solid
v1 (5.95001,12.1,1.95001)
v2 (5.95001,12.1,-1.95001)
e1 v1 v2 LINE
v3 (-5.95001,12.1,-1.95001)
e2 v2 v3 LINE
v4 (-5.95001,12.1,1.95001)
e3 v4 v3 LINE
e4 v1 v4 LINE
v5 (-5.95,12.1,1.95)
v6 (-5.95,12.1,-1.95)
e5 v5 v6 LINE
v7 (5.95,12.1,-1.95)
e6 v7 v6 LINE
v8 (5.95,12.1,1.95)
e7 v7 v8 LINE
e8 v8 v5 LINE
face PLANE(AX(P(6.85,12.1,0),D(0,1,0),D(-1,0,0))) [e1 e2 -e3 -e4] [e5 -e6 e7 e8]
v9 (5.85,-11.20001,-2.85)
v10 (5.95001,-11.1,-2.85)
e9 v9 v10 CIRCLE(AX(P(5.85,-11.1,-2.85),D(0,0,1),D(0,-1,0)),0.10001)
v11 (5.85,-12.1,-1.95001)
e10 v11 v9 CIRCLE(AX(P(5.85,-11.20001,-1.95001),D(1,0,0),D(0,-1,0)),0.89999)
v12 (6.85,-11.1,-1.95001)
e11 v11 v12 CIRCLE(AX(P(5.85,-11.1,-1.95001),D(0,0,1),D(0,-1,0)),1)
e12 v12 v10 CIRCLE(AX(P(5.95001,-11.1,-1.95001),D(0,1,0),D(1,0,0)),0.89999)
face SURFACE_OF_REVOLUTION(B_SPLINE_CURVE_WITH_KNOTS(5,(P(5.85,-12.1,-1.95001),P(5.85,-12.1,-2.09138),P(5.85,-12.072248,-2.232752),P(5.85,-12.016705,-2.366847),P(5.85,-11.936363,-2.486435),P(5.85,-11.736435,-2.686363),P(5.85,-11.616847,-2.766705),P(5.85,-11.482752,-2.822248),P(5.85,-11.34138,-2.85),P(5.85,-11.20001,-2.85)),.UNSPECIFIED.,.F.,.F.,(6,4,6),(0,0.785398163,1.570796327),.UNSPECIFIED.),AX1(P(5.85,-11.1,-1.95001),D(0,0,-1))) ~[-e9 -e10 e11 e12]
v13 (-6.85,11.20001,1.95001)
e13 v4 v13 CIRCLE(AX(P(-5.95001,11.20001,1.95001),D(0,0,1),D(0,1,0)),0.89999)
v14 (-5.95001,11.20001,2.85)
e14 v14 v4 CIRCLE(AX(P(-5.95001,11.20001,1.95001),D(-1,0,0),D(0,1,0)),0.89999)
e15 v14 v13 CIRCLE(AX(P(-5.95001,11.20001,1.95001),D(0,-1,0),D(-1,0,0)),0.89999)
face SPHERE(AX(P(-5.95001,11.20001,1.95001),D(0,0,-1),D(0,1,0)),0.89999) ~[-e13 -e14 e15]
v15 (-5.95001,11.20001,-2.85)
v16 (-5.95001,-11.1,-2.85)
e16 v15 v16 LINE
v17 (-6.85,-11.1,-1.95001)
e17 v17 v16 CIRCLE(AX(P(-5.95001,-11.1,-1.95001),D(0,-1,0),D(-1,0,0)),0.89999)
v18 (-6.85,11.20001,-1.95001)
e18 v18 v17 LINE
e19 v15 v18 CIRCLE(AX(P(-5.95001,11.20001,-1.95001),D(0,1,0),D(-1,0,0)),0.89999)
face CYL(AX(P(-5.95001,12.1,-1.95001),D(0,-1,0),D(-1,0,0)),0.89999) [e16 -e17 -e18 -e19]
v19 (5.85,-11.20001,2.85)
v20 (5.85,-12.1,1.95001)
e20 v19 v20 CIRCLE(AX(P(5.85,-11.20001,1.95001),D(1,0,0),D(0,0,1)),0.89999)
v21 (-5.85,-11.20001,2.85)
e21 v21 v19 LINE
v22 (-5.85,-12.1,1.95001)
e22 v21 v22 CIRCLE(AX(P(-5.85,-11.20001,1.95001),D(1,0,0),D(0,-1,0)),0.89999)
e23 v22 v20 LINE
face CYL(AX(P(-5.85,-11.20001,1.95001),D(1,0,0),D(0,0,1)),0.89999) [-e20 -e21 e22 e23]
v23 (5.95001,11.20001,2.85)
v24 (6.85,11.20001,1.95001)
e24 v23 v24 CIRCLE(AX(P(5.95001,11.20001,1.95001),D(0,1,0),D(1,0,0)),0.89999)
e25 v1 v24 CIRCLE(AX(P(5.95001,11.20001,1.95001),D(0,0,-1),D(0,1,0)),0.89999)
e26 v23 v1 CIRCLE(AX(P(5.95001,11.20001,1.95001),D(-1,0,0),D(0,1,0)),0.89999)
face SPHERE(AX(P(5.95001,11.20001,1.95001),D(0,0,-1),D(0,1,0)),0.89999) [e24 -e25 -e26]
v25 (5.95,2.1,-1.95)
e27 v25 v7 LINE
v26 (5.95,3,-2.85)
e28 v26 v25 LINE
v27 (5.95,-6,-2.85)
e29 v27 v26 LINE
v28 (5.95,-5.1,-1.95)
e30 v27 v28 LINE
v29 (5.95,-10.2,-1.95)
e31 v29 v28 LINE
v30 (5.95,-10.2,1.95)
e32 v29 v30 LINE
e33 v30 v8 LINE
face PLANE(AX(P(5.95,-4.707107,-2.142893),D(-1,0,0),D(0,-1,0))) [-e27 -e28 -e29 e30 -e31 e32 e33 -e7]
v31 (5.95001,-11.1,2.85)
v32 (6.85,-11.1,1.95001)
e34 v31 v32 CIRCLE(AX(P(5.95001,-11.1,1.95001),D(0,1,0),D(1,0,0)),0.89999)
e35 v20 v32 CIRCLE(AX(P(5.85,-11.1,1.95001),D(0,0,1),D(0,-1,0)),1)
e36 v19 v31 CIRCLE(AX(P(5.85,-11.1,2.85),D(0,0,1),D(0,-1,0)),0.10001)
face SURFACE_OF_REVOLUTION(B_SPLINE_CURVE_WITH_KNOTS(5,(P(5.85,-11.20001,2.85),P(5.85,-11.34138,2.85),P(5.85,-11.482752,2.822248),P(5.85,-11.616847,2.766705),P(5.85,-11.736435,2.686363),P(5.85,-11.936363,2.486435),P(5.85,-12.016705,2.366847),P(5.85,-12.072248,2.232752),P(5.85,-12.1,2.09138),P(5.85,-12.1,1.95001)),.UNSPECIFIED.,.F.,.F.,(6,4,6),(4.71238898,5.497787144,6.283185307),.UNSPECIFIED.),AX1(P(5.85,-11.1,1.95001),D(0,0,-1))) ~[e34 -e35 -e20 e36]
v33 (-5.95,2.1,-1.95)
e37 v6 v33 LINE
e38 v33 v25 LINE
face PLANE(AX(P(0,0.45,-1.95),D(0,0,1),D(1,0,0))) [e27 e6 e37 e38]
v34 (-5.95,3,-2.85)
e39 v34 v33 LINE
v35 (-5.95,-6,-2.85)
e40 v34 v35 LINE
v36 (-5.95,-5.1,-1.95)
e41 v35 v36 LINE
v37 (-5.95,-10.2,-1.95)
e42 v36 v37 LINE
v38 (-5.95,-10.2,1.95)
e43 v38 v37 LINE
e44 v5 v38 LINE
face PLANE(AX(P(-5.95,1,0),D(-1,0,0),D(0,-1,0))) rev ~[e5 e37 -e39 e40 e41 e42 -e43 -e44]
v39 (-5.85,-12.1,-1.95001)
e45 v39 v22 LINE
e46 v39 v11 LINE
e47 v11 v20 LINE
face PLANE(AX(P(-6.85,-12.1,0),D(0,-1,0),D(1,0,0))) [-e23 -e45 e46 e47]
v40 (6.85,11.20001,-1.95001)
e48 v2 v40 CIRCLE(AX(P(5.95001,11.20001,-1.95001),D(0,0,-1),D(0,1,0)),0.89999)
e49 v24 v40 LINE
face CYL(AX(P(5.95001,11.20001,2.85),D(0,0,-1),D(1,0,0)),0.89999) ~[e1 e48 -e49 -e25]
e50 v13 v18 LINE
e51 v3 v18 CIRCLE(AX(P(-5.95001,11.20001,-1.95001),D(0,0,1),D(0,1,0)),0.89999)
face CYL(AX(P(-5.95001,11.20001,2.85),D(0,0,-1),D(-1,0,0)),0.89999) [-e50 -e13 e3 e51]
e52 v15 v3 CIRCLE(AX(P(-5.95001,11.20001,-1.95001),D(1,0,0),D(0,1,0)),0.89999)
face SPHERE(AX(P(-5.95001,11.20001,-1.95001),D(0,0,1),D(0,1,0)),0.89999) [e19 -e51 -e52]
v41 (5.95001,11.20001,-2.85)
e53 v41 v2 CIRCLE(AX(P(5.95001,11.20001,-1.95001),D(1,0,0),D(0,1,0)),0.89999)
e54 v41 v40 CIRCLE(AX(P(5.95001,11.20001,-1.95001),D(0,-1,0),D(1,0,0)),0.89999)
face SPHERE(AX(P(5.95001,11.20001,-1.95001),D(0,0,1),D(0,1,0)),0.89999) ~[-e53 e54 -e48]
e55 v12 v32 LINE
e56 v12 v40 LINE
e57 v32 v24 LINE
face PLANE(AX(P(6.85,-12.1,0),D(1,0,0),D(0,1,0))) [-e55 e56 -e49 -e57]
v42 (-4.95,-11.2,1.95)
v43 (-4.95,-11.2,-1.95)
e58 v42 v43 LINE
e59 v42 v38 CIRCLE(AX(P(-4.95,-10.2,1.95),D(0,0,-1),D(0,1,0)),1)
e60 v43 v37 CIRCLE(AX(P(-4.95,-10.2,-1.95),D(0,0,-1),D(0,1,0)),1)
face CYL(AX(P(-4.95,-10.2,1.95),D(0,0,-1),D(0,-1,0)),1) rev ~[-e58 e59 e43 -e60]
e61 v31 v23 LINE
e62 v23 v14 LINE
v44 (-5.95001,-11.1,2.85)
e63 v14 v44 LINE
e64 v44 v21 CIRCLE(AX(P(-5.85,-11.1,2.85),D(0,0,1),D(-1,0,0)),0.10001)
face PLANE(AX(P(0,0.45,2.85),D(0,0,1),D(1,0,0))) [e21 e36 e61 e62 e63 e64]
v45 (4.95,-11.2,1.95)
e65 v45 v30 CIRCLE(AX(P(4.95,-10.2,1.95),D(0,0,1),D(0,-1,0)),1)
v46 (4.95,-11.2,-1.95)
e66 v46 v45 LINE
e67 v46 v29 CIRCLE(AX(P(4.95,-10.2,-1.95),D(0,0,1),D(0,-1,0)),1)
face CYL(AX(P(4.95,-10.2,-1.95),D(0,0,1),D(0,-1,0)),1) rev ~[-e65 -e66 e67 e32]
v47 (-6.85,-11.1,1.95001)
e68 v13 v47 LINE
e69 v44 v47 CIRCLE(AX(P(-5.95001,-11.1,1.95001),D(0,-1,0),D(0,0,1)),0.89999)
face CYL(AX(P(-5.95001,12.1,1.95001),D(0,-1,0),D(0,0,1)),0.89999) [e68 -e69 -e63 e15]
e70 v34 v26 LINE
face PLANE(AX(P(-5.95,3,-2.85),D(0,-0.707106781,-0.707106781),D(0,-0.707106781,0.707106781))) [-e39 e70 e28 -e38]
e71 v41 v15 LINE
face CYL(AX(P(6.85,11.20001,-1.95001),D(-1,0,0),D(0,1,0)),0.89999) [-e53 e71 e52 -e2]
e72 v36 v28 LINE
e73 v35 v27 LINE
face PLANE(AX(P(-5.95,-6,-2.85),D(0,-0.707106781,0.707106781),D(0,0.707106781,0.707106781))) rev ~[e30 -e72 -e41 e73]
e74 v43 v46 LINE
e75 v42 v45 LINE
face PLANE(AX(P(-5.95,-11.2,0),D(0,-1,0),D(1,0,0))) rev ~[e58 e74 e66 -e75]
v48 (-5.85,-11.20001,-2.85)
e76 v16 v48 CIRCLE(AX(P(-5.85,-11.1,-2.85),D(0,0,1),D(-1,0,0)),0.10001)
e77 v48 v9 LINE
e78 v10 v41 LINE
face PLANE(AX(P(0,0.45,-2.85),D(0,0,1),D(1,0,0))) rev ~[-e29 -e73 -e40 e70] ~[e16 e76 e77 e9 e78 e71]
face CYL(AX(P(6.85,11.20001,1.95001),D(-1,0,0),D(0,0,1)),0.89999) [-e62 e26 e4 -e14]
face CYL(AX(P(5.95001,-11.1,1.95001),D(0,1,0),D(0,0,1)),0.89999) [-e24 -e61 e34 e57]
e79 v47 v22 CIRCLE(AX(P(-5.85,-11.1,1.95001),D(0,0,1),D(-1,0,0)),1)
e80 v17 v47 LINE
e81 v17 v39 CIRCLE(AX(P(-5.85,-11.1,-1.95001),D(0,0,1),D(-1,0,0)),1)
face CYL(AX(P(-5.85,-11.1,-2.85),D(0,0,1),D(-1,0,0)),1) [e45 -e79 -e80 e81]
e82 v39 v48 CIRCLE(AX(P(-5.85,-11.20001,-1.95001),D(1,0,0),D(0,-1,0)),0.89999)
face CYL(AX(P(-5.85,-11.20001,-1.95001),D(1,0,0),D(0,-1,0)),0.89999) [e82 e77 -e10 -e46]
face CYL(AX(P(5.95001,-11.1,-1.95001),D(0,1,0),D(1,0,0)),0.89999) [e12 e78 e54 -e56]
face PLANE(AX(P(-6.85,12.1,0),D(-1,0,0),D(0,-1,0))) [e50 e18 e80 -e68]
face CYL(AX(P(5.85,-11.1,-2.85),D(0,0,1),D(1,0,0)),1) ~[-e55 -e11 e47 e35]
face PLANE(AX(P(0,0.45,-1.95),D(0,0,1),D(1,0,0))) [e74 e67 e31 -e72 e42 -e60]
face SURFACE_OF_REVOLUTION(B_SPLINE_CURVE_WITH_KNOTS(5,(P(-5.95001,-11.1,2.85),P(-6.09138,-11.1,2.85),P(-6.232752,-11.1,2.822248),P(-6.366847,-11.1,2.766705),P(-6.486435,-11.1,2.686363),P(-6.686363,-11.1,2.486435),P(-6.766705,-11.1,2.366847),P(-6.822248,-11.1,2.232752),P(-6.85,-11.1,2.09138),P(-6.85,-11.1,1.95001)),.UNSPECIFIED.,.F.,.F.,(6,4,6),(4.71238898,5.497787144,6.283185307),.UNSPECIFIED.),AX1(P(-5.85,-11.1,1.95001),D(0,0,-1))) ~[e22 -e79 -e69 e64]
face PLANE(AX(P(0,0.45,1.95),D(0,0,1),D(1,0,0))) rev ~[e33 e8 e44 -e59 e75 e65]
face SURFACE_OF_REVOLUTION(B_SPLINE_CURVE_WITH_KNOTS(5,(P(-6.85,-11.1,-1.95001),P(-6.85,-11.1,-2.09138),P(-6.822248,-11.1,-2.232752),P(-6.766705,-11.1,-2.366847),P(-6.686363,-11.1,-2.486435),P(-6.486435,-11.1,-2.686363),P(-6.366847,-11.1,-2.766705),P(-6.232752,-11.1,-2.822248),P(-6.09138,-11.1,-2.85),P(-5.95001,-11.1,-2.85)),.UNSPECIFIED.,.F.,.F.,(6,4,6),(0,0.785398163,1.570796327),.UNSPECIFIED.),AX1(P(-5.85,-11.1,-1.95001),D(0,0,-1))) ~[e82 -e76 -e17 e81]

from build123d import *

# Parameters (mm, degrees)
F1_DEPTH    = 2.85
F2_DEPTH    = 1.95
F3_DEPTH    = 2.85
F4_DEPTH    = 1.95
F5_R        = 1
F7_DEPTH    = 25
F8_T1_DEPTH = 11.9
F9_R        = 0.89999


# Not quite as in the source:
# - a fillet or chamfer that OpenCascade refuses, or shapes differently, is made with other operations: its cross-section is extruded or revolved along the edge and cut away or added
# - a fillet or chamfer is up to 0.001 mm smaller than in the source, because OpenCascade refuses the exact size


with BuildPart() as f1:
    # F0 (on Top) → F1 (new body)
    with BuildSketch(Plane.XY):
        Polygon((-5.95, 11.2), (-5.95, -11.2), (5.95, -11.2), (5.95, 11.2), (5.95, 12.1), (-5.95, 12.1), align=None)
        Polygon((5.95, -11.2), (-5.95, -11.2), (-5.95, 11.2), (-5.95, 12.1), (-6.85, 12.1), (-6.85, -12.1), (6.85, -12.1), (6.85, 12.1), (5.95, 12.1), (5.95, 11.2), align=None)
    extrude(amount=F1_DEPTH)

    # F0 (on Top) → F2 (cut)
    with BuildSketch(Plane.XY):
        Polygon((-5.95, 11.2), (-5.95, -11.2), (5.95, -11.2), (5.95, 11.2), (5.95, 12.1), (-5.95, 12.1), align=None)
    extrude(amount=F2_DEPTH, mode=Mode.SUBTRACT)

    # F0 (on Top) → F3 (join)
    with BuildSketch(Plane.XY):
        Polygon((-5.95, 11.2), (-5.95, -11.2), (5.95, -11.2), (5.95, 11.2), (5.95, 12.1), (-5.95, 12.1), align=None)
        Polygon((5.95, -11.2), (-5.95, -11.2), (-5.95, 11.2), (-5.95, 12.1), (-6.85, 12.1), (-6.85, -12.1), (6.85, -12.1), (6.85, 12.1), (5.95, 12.1), (5.95, 11.2), align=None)
    extrude(amount=-F3_DEPTH)

    # F0 (on Top) → F4 (cut)
    with BuildSketch(Plane.XY):
        Polygon((-5.95, 11.2), (-5.95, -11.2), (5.95, -11.2), (5.95, 11.2), (5.95, 12.1), (-5.95, 12.1), align=None)
    extrude(amount=-F4_DEPTH, mode=Mode.SUBTRACT)

    # F5
    f5_edges = [f1.edges().sort_by_distance(p)[0] for p in [
        (5.95, -11.2, 0),
        (-5.95, -11.2, 0),
        (-6.85, -12.1, 0),
        (6.85, -12.1, 0),
    ]]
    fillet(f5_edges, radius=F5_R)

    # F6 (on Top) → F7 (cut)
    with BuildSketch(Plane.XY):
        Polygon((-5.95, 1), (-5.95, -4), (5.95, -4), (5.95, 1), (0, 1), align=None)
    extrude(amount=-F7_DEPTH, mode=Mode.SUBTRACT)

    # F8: chamfer of 2 on 2 edges, made by hand

    # F8_s2 → F8_t1 (cut)
    with BuildSketch(Plane.YZ.offset(-5.95)):
        Polygon((-6, -2.85), (-4, -0.85), (-4, -2.85), align=None)
        Polygon((3, -2.85), (1, -0.85), (1, -2.85), align=None)
    extrude(amount=F8_T1_DEPTH, mode=Mode.SUBTRACT)

    # F9 (radius 0.9 in the source; OpenCascade refuses exactly that, so slightly less here)
    f9_edges = [f1.edges().sort_by_distance(p)[0] for p in [
        (6.85, 12.1, 0),
        (-6.85, 12.1, 0),
        (0, 12.1, -2.85),
        (0, 12.1, 2.85),
        (6.85, 0.5, -2.85),
        (0, -12.1, 2.85),
        (-6.85, 0.5, 2.85),
        (-6.85, 0.5, -2.85),
        (-6.557107, -11.807107, -2.85),
        (0, -12.1, -2.85),
        (6.557107, -11.807107, -2.85),
        (6.85, 0.5, 2.85),
        (6.557107, -11.807107, 2.85),
        (-6.557107, -11.807107, 2.85),
    ]]
    fillet(f9_edges, radius=F9_R)


solid = f1.part
